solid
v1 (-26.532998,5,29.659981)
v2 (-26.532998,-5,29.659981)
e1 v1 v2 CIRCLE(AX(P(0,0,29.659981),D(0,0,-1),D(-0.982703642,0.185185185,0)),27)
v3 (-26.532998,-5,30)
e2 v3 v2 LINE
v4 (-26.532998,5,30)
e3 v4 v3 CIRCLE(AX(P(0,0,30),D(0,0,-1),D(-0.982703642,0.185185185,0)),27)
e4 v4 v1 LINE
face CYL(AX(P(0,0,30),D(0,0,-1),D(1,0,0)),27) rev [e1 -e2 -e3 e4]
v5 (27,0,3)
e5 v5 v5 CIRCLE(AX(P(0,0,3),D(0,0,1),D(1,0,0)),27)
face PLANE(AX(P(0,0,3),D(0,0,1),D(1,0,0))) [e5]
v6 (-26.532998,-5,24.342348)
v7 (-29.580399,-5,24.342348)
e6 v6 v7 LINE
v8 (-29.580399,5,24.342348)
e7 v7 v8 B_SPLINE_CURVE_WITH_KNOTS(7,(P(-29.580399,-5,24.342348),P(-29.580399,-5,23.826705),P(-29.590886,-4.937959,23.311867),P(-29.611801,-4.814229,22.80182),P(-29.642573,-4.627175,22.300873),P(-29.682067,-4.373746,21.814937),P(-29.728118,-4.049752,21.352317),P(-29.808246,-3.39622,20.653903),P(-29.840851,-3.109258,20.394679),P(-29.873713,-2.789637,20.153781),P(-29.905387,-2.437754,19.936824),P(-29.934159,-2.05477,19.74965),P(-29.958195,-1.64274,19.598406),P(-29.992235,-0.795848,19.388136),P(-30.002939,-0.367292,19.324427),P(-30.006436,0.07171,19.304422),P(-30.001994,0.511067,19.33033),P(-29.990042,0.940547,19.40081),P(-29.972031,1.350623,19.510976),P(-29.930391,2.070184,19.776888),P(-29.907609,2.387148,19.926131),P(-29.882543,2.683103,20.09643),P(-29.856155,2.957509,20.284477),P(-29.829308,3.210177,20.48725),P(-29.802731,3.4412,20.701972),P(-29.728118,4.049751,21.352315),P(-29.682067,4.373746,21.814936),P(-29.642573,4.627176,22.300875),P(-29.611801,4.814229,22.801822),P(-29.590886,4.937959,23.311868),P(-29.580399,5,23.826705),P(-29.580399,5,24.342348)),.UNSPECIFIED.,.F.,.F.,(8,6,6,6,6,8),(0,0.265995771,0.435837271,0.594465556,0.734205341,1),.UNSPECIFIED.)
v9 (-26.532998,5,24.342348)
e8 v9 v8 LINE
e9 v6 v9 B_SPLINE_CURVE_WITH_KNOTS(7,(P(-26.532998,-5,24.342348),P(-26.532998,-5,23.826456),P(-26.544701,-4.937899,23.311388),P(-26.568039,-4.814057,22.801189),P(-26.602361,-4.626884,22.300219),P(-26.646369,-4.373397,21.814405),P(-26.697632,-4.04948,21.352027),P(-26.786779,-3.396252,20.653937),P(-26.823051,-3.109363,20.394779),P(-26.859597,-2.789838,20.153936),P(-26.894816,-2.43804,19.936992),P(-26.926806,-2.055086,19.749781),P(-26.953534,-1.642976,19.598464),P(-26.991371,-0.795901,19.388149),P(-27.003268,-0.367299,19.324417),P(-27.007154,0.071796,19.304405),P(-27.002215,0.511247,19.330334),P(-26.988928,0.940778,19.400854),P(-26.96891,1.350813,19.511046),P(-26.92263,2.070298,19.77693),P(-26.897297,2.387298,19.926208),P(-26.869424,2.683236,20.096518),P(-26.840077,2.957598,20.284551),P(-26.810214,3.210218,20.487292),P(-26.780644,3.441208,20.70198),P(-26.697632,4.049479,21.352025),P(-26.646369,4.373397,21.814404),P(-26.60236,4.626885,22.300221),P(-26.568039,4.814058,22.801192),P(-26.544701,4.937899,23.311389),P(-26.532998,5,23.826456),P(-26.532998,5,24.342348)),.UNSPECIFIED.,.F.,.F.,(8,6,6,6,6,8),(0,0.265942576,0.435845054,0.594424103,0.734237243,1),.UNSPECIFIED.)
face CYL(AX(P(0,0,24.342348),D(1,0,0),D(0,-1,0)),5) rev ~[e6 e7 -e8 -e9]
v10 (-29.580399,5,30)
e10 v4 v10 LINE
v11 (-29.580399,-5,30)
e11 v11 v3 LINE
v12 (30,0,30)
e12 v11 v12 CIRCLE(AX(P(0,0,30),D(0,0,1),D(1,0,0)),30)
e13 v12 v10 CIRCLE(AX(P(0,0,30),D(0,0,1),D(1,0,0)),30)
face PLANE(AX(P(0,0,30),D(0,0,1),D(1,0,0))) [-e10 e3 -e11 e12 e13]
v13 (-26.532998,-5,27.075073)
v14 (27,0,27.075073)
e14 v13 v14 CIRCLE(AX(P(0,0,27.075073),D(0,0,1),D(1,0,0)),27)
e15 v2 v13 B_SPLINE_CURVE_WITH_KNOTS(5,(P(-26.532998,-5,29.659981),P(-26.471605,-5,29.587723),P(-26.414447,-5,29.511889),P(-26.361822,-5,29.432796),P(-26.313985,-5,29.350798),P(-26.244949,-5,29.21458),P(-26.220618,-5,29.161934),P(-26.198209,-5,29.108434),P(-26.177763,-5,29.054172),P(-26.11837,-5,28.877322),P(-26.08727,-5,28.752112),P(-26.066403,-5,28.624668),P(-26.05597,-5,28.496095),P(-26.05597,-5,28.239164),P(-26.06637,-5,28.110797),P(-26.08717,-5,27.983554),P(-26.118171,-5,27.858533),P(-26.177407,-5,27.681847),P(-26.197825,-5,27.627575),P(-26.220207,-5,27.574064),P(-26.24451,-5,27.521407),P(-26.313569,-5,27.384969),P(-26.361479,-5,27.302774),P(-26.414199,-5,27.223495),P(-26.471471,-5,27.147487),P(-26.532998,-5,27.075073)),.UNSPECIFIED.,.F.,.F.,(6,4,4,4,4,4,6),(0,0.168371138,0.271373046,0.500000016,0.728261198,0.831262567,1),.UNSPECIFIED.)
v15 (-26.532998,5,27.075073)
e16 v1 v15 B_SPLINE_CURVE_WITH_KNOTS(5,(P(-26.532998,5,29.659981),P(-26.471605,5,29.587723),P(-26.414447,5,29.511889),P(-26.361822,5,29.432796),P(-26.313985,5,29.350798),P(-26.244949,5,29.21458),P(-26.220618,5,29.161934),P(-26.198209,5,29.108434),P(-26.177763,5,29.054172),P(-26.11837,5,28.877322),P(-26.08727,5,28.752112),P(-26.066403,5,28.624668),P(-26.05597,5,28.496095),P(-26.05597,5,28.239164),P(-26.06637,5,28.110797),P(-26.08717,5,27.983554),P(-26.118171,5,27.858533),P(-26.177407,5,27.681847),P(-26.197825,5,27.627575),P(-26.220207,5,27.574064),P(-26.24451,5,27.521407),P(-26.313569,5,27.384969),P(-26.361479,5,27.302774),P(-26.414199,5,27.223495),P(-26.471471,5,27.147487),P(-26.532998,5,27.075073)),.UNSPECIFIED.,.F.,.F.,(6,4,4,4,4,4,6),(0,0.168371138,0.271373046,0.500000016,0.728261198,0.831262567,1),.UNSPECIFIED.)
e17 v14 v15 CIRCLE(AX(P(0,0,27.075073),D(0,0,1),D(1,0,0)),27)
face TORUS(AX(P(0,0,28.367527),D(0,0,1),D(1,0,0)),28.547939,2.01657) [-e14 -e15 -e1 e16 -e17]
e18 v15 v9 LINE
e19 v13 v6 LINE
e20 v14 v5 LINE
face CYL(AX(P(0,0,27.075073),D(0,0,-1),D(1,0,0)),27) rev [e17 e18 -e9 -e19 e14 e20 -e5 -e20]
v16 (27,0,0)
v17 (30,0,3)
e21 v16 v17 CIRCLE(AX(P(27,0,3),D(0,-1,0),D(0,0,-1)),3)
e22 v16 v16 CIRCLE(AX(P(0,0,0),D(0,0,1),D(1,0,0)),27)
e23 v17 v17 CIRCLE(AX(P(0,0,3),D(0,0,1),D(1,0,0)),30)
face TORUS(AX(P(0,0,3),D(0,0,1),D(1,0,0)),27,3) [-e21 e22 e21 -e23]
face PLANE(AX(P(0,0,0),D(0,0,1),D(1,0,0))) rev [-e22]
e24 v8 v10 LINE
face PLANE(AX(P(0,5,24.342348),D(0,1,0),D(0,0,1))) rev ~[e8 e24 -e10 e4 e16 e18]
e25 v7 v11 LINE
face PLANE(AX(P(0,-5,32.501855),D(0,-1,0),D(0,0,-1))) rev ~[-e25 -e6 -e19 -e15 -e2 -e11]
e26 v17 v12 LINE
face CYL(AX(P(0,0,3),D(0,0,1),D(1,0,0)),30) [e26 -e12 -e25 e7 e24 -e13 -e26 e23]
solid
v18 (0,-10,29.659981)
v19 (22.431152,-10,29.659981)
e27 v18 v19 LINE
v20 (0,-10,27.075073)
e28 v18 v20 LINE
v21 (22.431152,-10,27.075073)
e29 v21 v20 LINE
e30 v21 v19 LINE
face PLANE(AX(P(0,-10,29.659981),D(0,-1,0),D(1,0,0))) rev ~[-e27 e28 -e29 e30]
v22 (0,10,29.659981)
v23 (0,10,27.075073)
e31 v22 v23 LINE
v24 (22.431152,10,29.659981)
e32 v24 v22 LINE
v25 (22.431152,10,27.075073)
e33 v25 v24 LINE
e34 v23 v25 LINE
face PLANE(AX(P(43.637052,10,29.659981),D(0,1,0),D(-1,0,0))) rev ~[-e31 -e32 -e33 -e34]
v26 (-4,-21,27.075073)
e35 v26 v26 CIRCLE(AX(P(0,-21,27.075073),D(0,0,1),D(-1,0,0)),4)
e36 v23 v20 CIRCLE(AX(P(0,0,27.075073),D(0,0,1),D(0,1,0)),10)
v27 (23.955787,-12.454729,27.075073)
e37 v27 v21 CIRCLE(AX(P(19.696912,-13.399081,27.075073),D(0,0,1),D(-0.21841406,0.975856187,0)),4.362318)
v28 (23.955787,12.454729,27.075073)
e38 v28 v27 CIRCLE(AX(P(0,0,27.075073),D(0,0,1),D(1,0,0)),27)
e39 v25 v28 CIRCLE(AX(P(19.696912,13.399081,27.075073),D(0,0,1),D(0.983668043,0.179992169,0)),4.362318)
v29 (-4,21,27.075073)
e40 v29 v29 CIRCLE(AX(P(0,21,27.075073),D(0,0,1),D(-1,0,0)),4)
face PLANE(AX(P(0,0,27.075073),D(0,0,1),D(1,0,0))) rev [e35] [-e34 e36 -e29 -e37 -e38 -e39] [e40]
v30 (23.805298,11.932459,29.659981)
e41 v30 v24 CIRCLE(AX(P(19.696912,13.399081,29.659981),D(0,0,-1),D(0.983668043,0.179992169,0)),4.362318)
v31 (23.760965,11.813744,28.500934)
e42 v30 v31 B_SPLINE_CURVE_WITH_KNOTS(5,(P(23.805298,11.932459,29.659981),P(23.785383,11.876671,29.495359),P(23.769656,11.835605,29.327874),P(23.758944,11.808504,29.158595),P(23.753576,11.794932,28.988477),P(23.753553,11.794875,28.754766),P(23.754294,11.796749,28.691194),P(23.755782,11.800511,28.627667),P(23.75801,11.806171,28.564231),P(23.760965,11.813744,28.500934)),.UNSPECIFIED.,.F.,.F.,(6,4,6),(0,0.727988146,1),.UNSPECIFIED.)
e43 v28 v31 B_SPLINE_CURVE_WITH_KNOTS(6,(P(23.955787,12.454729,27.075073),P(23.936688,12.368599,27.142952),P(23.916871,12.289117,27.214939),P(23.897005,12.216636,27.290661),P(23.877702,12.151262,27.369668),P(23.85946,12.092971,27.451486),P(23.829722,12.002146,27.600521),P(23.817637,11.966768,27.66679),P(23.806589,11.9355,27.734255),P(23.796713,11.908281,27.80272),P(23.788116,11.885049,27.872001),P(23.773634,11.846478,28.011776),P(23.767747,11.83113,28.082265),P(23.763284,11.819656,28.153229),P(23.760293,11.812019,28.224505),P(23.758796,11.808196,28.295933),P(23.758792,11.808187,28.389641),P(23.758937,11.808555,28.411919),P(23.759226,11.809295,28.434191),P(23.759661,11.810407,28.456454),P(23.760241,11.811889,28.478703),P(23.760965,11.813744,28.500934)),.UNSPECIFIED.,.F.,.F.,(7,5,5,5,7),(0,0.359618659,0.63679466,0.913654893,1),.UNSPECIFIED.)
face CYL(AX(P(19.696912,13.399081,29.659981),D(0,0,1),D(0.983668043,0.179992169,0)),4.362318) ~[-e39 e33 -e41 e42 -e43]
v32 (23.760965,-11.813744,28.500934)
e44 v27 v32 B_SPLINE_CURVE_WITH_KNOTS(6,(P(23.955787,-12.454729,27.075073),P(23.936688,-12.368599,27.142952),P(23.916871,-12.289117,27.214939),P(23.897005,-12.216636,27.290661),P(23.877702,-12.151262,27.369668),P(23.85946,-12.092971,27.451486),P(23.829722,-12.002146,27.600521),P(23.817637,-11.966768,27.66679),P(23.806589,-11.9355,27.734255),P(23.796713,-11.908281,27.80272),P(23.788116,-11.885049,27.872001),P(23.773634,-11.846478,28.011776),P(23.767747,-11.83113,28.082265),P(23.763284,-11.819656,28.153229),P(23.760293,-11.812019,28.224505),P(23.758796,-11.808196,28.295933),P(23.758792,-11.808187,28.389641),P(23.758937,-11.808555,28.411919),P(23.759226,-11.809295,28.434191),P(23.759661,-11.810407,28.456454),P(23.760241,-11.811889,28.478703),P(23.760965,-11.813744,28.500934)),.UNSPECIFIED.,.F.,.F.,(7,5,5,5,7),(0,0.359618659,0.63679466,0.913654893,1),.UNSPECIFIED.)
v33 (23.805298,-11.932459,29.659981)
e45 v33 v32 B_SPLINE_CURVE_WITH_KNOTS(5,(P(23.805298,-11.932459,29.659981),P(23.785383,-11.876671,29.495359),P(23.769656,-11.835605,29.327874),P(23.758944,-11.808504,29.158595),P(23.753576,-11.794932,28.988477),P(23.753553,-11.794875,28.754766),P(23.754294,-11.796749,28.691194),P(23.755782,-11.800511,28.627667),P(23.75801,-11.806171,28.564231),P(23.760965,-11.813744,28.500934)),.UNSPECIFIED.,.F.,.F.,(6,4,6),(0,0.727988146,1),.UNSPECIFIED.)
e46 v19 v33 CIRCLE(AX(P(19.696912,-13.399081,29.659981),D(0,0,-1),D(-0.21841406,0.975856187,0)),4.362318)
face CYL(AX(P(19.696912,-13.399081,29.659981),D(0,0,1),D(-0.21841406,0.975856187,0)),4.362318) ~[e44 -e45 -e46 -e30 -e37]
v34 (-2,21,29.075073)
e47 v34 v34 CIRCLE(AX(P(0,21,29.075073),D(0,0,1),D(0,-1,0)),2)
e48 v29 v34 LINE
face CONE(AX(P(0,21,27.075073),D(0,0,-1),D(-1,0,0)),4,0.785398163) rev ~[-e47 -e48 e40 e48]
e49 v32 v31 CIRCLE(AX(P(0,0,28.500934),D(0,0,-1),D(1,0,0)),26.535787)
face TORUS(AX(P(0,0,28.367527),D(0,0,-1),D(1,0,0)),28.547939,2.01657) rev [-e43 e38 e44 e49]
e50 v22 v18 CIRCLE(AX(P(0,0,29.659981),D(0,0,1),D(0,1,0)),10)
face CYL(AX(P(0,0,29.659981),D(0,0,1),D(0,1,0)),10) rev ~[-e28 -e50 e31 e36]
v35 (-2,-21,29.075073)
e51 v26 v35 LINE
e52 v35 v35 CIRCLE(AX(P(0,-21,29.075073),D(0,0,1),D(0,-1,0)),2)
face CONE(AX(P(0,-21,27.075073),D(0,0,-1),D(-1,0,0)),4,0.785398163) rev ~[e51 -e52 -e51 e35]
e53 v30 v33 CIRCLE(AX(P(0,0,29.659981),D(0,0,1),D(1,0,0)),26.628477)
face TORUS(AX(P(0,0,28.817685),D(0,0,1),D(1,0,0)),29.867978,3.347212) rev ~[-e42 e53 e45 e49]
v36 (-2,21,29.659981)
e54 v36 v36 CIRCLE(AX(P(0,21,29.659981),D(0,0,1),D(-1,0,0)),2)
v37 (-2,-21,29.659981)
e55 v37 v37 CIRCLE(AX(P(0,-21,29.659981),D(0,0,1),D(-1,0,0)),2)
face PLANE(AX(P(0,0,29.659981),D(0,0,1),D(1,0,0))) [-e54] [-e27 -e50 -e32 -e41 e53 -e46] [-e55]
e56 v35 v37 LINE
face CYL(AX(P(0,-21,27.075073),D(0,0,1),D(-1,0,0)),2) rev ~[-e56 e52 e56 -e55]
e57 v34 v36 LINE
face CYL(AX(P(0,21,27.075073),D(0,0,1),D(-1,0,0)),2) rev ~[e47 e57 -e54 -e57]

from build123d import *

# Parameters (mm, degrees)
F7_DEPTH        = 25
F9_DEPTH        = 25
F11_D           = 4
F11_CSINK_D     = 8
F11_CSINK_ANGLE = 90
F13_DEPTH       = 30.001


# Not quite as in the source:
# - a feature of the source that left no trace in its solid (it failed there, or was rolled back) is left out


with BuildPart() as f1:
    # F0 (on Front) → F1 (revolve)
    with BuildSketch(Plane.XZ):
        with BuildLine():
            Line((0, 3), (0, 0))
            Line((0, 0), (27, 0))
            ThreePointArc((27, 0), (29.1213203436, 0.8786796564), (30, 3))
            Line((30, 3), (30, 30))
            Line((30, 30), (27, 30))
            Line((27, 30), (27, 29.659981063))
            ThreePointArc((27, 29.659981063), (26.5313694768, 28.3675268292), (27, 27.0750725955))
            Line((27, 27.0750725955), (27, 3))
            Line((27, 3), (0, 3))
        make_face()
    revolve(axis=Axis((0, 0, 20.7135844976), (0, 0, 1)))

    # F12 (on Right) → F13 (cut, through all)
    with BuildSketch(Plane.YZ):
        with BuildLine():
            Line((5, 24.3423475833), (5, 32.1951069077))
            Line((5, 32.1951069077), (-5, 32.5018552183))
            Line((-5, 32.5018552183), (-5, 24.3423475833))
            ThreePointArc((-5, 24.3423475833), (0, 19.3423475833), (5, 24.3423475833))
        make_face()
    extrude(amount=-F13_DEPTH, mode=Mode.SUBTRACT)


with BuildPart() as f2:
    # F0 (on Front) → F2 (revolve)
    with BuildSketch(Plane.XZ):
        with BuildLine():
            Line((0, 27.0750725955), (27, 27.0750725955))
            ThreePointArc((27, 27.0750725955), (26.5313694768, 28.3675268292), (27, 29.659981063))
            Line((27, 29.659981063), (0, 29.659981063))
            Line((0, 29.659981063), (0, 27.0750725955))
        make_face()
    revolve(axis=Axis((0, 0, 20.7135844976), (0, 0, 1)))

    # F4 (on Front) → F5 (revolve, cut)
    with BuildSketch(Plane.XZ):
        with BuildLine():
            Line((27.2429585457, 29.4521301985), (27.0748790354, 30.6622516364))
            ThreePointArc((27.0748790354, 30.6622516364), (26.5911281972, 29.5003878586), (26.570642367, 28.2420068979))
            Line((26.570642367, 28.2420068979), (27.2429585457, 29.4521301985))
        make_face()
    revolve(axis=Axis((0, 0, 20.7135844976), (0, 0, 1)), mode=Mode.SUBTRACT)

    # F6 (on face) → F7 (cut)
    with BuildSketch(Plane.XY.offset(29.659981063)):
        with BuildLine():
            ThreePointArc((0, -10), (7.0710678119, -7.0710678119), (10, 0))
            ThreePointArc((10, 0), (7.0710678119, 7.0710678119), (0, 10))
            ThreePointArc((0, 10), (-10, 0), (0, -10))
        make_face()
        with BuildLine():
            ThreePointArc((0, 10), (7.0710678119, 7.0710678119), (10, 0))
            ThreePointArc((10, 0), (7.0710678119, -7.0710678119), (0, -10))
            Line((0, -10), (44.3025864661, -10))
            Line((44.3025864661, -10), (43.6370521784, 10))
            Line((43.6370521784, 10), (0, 10))
        make_face()
    extrude(amount=-F7_DEPTH, mode=Mode.SUBTRACT)

    # F8 (on face) → F9 (cut)
    with BuildSketch(Plane.XY.offset(29.659981063)):
        with BuildLine():
            ThreePointArc((23.9879842848, 14.1842635348), (22.7204724664, 10.2545780002), (18.7441203743, 9.1420859098))
            Line((18.7441203743, 9.1420859098), (19.8477320373, 7.0414338261))
            Line((19.8477320373, 7.0414338261), (30.4011907429, 7.6118907891))
            Line((30.4011907429, 7.6118907891), (23.9879842848, 14.1842635348))
        make_face()
        with BuildLine():
            Line((19.8477320373, -7.0414338261), (18.7441203743, -9.1420859098))
            ThreePointArc((18.7441203743, -9.1420859098), (22.7204724664, -10.2545780002), (23.9879842848, -14.1842635348))
            Line((23.9879842848, -14.1842635348), (30.4011907429, -7.6118907891))
            Line((30.4011907429, -7.6118907891), (19.8477320373, -7.0414338261))
        make_face()
    extrude(amount=-F9_DEPTH, mode=Mode.SUBTRACT)

    # F11 (through all)
    with Locations(Plane(origin=(0, 0, 27.0750725955), x_dir=(1, 0, 0), z_dir=(0, 0, -1))):
        with Locations((0, 21), (0, -21)):
            CounterSinkHole(F11_D / 2, F11_CSINK_D / 2, counter_sink_angle=F11_CSINK_ANGLE)


solid = Compound([f1.part, f2.part])
